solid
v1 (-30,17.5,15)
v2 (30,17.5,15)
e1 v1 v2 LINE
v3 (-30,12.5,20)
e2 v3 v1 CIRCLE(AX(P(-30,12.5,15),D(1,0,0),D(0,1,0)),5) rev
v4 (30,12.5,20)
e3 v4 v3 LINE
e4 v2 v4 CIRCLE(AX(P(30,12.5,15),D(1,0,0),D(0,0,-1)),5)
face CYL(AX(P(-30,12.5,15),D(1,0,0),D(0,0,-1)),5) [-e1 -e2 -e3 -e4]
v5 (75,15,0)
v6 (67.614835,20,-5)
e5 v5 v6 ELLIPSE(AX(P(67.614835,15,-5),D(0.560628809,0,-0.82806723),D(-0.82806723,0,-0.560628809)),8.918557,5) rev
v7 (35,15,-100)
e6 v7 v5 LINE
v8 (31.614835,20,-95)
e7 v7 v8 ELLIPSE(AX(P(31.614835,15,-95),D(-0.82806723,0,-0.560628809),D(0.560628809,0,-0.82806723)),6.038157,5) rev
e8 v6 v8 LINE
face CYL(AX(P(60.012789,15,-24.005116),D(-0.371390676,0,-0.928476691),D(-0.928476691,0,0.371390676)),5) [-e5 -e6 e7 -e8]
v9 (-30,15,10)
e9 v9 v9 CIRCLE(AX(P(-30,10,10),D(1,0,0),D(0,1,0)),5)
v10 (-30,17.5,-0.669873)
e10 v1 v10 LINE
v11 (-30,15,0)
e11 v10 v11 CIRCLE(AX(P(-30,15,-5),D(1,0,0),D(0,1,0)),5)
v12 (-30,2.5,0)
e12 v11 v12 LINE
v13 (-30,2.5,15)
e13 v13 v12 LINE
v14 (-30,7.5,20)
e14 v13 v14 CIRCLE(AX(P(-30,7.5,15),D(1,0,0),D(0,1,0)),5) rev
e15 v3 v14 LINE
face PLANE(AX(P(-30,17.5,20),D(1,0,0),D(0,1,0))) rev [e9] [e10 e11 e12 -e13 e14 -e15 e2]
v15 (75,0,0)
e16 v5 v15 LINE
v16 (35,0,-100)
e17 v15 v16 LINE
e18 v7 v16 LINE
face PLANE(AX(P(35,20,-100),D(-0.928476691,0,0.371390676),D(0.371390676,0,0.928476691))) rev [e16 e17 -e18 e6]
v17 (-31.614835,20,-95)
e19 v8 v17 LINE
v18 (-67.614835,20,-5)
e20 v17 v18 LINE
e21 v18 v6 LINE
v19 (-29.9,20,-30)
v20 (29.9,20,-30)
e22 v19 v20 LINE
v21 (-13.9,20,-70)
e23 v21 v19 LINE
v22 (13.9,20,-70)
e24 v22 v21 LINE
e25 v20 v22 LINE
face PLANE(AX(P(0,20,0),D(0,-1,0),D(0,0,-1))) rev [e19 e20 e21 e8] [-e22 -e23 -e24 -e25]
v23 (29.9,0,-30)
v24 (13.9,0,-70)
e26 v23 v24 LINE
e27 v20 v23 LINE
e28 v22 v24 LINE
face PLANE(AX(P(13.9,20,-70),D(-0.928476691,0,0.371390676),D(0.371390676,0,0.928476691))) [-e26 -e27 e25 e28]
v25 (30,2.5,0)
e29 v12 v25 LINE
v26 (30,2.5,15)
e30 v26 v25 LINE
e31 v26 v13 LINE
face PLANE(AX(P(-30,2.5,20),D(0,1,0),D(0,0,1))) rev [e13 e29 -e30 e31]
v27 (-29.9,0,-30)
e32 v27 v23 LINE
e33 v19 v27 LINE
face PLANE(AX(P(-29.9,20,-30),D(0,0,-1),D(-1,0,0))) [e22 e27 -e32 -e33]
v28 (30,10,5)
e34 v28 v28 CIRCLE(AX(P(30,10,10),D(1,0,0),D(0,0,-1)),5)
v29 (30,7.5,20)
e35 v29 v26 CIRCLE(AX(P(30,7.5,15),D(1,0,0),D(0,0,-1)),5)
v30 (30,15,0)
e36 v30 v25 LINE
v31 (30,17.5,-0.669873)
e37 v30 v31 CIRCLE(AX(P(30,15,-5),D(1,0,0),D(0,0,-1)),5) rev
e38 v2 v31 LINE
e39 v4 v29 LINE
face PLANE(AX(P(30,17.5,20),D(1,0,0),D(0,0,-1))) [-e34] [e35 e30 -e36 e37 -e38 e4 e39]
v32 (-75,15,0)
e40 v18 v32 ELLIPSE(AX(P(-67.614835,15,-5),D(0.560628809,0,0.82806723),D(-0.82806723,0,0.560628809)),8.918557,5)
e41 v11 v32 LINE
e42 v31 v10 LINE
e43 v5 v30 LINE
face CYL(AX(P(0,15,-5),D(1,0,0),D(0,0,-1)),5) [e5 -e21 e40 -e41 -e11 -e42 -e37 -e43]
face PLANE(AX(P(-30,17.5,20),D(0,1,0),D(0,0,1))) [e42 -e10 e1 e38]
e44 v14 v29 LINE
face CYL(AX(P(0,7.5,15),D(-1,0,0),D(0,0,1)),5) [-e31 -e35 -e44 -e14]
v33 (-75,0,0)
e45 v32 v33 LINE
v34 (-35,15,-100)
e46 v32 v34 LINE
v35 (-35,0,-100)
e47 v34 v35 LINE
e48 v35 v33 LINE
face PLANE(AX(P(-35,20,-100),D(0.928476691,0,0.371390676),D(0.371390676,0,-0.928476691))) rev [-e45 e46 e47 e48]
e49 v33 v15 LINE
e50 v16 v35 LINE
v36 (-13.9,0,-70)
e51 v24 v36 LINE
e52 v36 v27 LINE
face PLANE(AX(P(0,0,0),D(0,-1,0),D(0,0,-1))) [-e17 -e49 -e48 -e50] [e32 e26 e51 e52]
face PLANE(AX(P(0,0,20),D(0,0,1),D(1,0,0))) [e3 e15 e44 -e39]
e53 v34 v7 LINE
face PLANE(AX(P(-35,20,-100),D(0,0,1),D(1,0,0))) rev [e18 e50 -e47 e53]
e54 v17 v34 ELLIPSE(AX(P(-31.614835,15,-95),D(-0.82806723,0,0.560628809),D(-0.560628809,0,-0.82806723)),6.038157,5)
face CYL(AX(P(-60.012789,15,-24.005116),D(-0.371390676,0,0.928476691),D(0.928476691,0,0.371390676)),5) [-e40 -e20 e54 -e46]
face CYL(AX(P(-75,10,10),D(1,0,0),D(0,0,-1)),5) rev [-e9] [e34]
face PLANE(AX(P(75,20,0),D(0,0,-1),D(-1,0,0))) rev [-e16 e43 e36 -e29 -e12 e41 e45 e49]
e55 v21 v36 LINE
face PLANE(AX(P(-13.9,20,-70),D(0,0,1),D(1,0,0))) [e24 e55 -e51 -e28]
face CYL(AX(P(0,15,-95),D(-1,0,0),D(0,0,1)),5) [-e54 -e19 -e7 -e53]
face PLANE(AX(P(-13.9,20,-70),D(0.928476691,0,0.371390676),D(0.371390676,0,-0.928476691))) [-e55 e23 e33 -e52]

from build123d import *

# Parameters (mm, degrees)
BOSS_EXTRUDE1_DEPTH = 20
SKETCH2_W           = 60
SKETCH2_H           = 15
BOSS_EXTRUDE2_DEPTH = 20
SKETCH3_R           = 5
CUT_EXTRUDE1_DEPTH  = 147.372811683
FILLET1_R           = 5


with BuildPart() as part:
    # Sketch1 → Boss-Extrude1 (new body)
    with BuildSketch(Plane(origin=(0, 0, 0), x_dir=(1, 0, 0), z_dir=(0, 1, 0))):
        Polygon((-35, 100), (35, 100), (75, 0), (-75, 0), align=None)
        Polygon((-13.9, 70), (13.9, 70), (29.9, 30), (-29.9, 30), align=None, mode=Mode.SUBTRACT)
    extrude(amount=BOSS_EXTRUDE1_DEPTH)

    # Sketch2 → Boss-Extrude2 (add)
    with BuildSketch(Plane.XY):
        with Locations((0, 10)):
            Rectangle(SKETCH2_W, SKETCH2_H)
    extrude(amount=BOSS_EXTRUDE2_DEPTH)

    # Sketch3 → Cut-Extrude1 (cut, through all)
    with BuildSketch(Plane(origin=(30, 0, 0), x_dir=(0, 0, -1), z_dir=(1, 0, 0))):
        with Locations((-10, 10)):
            Circle(SKETCH3_R)
    extrude(amount=-CUT_EXTRUDE1_DEPTH, mode=Mode.SUBTRACT)

    # Fillet1
    # the kernel refuses this fillet: 5 mm, written as the material it takes off along each edge
    with BuildSketch(Plane(origin=(87.5, 20, 0), x_dir=(0, 0, -1), z_dir=(-1, 0, 0))) as fillet1_piece_1_section:
        with BuildLine():
            CenterArc((FILLET1_R, FILLET1_R), FILLET1_R, 180, 90)
            Line((0, FILLET1_R), (0, 0))
            Line((0, 0), (FILLET1_R, 0))
        make_face()
    fillet1_piece_1 = extrude(amount=175, mode=Mode.PRIVATE)
    fillet1_piece_1 = split(fillet1_piece_1, bisect_by=Plane(origin=(30, 19.178041178, -1.2756003), z_dir=(1, 0, 0)), keep=Keep.TOP, mode=Mode.PRIVATE)
    fillet1_piece_1 = split(fillet1_piece_1, bisect_by=Plane(origin=(58.75, 17.5, -1.2756003), z_dir=(0, 1, 0)), keep=Keep.TOP, mode=Mode.PRIVATE)
    add(fillet1_piece_1, mode=Mode.SUBTRACT)
    with BuildSketch(Plane(origin=(87.5, 20, 0), x_dir=(0, 0, -1), z_dir=(-1, 0, 0))) as fillet1_piece_2_section:
        with BuildLine():
            CenterArc((FILLET1_R, FILLET1_R), FILLET1_R, 180, 90)
            Line((0, FILLET1_R), (0, 0))
            Line((0, 0), (FILLET1_R, 0))
        make_face()
    fillet1_piece_2 = extrude(amount=175, mode=Mode.PRIVATE)
    fillet1_piece_2 = split(fillet1_piece_2, bisect_by=Plane(origin=(30, 16.683746077, -0.120041908), z_dir=(1, 0, 0)), keep=Keep.TOP, mode=Mode.PRIVATE)
    fillet1_piece_2 = split(fillet1_piece_2, bisect_by=Plane(origin=(58.75, 17.5, -0.120041908), z_dir=(0, -1, 0)), keep=Keep.TOP, mode=Mode.PRIVATE)
    add(fillet1_piece_2, mode=Mode.SUBTRACT)
    with BuildSketch(Plane(origin=(87.5, 20, 0), x_dir=(0, 0, -1), z_dir=(-1, 0, 0))) as fillet1_piece_3_section:
        with BuildLine():
            CenterArc((FILLET1_R, FILLET1_R), FILLET1_R, 180, 90)
            Line((0, FILLET1_R), (0, 0))
            Line((0, 0), (FILLET1_R, 0))
        make_face()
    fillet1_piece_3 = extrude(amount=175, mode=Mode.PRIVATE)
    fillet1_piece_3 = split(fillet1_piece_3, bisect_by=Plane(origin=(-30, 19.178041178, -1.2756003), z_dir=(1, 0, 0)), keep=Keep.TOP, mode=Mode.PRIVATE)
    fillet1_piece_3 = split(fillet1_piece_3, bisect_by=Plane(origin=(30, 19.178041178, -1.2756003), z_dir=(-1, 0, 0)), keep=Keep.TOP, mode=Mode.PRIVATE)
    fillet1_piece_3 = split(fillet1_piece_3, bisect_by=Plane(origin=(0, 17.5, -1.2756003), z_dir=(0, 1, 0)), keep=Keep.TOP, mode=Mode.PRIVATE)
    add(fillet1_piece_3, mode=Mode.SUBTRACT)
    with BuildSketch(Plane(origin=(87.5, 20, 0), x_dir=(0, 0, -1), z_dir=(-1, 0, 0))) as fillet1_piece_4_section:
        with BuildLine():
            CenterArc((FILLET1_R, FILLET1_R), FILLET1_R, 180, 90)
            Line((0, FILLET1_R), (0, 0))
            Line((0, 0), (FILLET1_R, 0))
        make_face()
    fillet1_piece_4 = extrude(amount=175, mode=Mode.PRIVATE)
    fillet1_piece_4 = split(fillet1_piece_4, bisect_by=Plane(origin=(-30, 19.178041178, -1.2756003), z_dir=(-1, 0, 0)), keep=Keep.TOP, mode=Mode.PRIVATE)
    fillet1_piece_4 = split(fillet1_piece_4, bisect_by=Plane(origin=(-58.75, 17.5, -1.2756003), z_dir=(0, 1, 0)), keep=Keep.TOP, mode=Mode.PRIVATE)
    add(fillet1_piece_4, mode=Mode.SUBTRACT)
    with BuildSketch(Plane(origin=(87.5, 20, 0), x_dir=(0, 0, -1), z_dir=(-1, 0, 0))) as fillet1_piece_5_section:
        with BuildLine():
            CenterArc((FILLET1_R, FILLET1_R), FILLET1_R, 180, 90)
            Line((0, FILLET1_R), (0, 0))
            Line((0, 0), (FILLET1_R, 0))
        make_face()
    fillet1_piece_5 = extrude(amount=175, mode=Mode.PRIVATE)
    fillet1_piece_5 = split(fillet1_piece_5, bisect_by=Plane(origin=(-30, 16.683746077, -0.120041908), z_dir=(-1, 0, 0)), keep=Keep.TOP, mode=Mode.PRIVATE)
    fillet1_piece_5 = split(fillet1_piece_5, bisect_by=Plane(origin=(-58.75, 17.5, -0.120041908), z_dir=(0, -1, 0)), keep=Keep.TOP, mode=Mode.PRIVATE)
    add(fillet1_piece_5, mode=Mode.SUBTRACT)
    with BuildSketch(Plane(origin=(-79.642383454, 20, 11.605958636), x_dir=(0, -1, 0), z_dir=(0.37139067635410355, 0, -0.9284766908852595)), Plane(origin=(30.357616546, 20, -111.605958636), x_dir=(0, -1, 0), z_dir=(0.37139067635410383, 0, 0.9284766908852593))) as fillet1_piece_6:
        with BuildLine():
            CenterArc((FILLET1_R, -FILLET1_R), FILLET1_R, 90, 90)
            Line((0, -FILLET1_R), (0, 0))
            Line((0, 0), (FILLET1_R, 0))
        make_face()
    extrude(amount=132.703296143, mode=Mode.SUBTRACT)
    with BuildSketch(Plane(origin=(-47.5, 20, -100), x_dir=(0, -1, 0), z_dir=(1, 0, 0))) as fillet1_piece_7:
        with BuildLine():
            CenterArc((FILLET1_R, -FILLET1_R), FILLET1_R, 90, 90)
            Line((0, -FILLET1_R), (0, 0))
            Line((0, 0), (FILLET1_R, 0))
        make_face()
    extrude(amount=95, mode=Mode.SUBTRACT)
    with BuildSketch(Plane(origin=(42.5, 2.5, 20), x_dir=(0, 0, -1), z_dir=(-1, 0, 0)), Plane(origin=(-42.5, 17.5, 20), x_dir=(0, 0, -1), z_dir=(1, 0, 0))) as fillet1_piece_8:
        with BuildLine():
            CenterArc((FILLET1_R, -FILLET1_R), FILLET1_R, 90, 90)
            Line((0, -FILLET1_R), (0, 0))
            Line((0, 0), (FILLET1_R, 0))
        make_face()
    extrude(amount=85, mode=Mode.SUBTRACT)


solid = part.part
